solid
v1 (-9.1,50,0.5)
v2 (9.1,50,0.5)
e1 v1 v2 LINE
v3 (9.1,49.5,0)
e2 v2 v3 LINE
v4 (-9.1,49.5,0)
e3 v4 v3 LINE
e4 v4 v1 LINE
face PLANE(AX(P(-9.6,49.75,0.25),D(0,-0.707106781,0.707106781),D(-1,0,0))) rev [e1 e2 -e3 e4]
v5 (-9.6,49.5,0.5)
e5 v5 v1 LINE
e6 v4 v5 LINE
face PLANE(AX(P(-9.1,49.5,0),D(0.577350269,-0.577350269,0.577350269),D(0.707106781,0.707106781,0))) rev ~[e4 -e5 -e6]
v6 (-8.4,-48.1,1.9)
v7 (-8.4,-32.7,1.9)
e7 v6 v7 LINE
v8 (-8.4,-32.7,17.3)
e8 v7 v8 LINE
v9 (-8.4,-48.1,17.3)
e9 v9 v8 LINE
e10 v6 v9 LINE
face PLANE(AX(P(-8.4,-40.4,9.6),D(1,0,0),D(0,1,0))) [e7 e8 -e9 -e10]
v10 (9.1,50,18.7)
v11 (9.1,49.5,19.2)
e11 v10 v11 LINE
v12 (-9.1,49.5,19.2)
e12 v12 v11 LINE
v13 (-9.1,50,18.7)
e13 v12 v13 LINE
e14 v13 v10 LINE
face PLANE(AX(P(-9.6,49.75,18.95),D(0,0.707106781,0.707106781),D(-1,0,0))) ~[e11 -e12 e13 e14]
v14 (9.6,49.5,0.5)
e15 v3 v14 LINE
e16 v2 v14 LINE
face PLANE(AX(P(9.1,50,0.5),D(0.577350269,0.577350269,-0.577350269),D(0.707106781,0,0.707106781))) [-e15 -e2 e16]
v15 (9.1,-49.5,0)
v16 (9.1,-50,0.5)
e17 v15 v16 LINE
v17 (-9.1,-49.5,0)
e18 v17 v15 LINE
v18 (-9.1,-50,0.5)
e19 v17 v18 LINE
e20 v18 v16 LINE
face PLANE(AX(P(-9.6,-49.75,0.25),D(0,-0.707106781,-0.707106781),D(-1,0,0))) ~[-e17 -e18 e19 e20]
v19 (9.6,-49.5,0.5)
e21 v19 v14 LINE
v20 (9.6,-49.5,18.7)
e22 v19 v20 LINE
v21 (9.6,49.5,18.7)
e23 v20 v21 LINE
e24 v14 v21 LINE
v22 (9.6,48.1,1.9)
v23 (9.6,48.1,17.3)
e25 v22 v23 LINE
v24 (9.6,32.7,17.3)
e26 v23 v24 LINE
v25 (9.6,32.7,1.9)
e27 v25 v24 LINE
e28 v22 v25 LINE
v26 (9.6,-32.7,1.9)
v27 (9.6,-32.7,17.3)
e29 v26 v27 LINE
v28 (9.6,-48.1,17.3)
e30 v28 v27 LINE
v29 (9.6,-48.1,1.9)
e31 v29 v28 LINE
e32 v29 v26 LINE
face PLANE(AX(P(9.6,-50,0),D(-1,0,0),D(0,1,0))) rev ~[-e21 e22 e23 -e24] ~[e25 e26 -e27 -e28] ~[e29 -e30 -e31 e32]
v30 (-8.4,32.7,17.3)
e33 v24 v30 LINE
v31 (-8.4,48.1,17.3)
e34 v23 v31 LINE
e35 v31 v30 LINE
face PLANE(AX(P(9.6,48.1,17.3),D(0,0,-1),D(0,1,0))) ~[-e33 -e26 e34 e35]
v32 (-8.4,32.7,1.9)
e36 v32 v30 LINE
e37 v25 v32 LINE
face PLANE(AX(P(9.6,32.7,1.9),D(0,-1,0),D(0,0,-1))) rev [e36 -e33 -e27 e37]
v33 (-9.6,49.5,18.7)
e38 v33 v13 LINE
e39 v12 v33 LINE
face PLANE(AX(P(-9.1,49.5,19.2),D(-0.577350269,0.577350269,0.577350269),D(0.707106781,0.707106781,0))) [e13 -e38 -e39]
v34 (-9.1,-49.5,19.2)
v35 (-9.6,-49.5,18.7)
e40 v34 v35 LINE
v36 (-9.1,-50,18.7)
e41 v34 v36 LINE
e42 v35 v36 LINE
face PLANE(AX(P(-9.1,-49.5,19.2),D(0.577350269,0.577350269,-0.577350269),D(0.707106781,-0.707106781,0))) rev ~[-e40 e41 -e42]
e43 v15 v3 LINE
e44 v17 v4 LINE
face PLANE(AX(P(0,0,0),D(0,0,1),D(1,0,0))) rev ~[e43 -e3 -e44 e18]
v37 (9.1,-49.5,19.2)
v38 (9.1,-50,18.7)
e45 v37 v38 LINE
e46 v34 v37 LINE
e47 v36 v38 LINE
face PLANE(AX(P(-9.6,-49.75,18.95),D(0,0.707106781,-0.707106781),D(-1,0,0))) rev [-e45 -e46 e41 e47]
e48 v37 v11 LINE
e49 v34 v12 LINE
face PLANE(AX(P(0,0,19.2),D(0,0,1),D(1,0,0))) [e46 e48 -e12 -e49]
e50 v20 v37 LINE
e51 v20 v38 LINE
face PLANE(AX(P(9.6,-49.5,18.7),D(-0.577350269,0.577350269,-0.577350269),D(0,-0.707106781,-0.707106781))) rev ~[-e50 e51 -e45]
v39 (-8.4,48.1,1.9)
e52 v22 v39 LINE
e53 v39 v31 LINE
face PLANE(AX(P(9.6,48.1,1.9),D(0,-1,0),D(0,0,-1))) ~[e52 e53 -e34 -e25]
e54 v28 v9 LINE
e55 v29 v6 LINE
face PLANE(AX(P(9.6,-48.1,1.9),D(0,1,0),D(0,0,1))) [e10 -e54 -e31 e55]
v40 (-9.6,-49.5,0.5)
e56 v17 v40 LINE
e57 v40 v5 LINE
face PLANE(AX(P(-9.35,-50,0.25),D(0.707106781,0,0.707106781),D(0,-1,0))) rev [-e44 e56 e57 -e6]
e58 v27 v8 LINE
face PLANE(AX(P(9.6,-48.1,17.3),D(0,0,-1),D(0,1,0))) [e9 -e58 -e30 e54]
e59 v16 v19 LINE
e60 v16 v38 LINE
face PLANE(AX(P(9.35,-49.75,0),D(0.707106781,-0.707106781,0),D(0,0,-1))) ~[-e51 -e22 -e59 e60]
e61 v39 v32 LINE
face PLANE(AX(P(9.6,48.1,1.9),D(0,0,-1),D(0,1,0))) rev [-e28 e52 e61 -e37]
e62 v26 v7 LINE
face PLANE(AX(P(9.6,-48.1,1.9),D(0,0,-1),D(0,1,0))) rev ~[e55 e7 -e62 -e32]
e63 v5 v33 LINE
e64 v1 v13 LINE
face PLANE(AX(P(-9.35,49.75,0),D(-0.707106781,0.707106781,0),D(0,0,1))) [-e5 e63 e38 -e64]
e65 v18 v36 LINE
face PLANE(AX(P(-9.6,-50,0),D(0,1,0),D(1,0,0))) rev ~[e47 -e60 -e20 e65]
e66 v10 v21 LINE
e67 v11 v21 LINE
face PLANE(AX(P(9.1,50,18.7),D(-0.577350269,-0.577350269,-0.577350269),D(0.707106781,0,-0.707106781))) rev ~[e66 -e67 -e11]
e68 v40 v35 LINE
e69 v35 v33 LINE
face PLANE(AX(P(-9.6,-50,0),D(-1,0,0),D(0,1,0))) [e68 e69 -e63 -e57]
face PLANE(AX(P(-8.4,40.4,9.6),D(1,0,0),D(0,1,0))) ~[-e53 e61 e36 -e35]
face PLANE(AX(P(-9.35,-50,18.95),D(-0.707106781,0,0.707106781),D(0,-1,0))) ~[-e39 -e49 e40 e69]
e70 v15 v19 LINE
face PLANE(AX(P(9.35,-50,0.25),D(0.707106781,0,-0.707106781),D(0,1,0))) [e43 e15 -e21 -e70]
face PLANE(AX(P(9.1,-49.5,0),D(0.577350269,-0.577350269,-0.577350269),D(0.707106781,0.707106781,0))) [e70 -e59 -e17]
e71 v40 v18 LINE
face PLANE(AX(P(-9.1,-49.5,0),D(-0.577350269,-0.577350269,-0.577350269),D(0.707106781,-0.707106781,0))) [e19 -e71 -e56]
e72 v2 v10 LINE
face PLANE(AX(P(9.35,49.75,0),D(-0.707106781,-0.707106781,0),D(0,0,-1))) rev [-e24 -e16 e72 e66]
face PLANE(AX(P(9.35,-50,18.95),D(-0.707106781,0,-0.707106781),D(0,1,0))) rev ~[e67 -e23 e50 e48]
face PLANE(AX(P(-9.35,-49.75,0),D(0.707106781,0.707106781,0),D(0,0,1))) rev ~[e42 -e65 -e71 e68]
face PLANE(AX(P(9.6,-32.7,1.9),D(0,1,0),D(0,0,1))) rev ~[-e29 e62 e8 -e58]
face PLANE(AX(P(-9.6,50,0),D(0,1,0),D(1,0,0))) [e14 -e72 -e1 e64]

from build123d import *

# Parameters (mm, degrees)
F0_W     = 19.2
F0_H     = 100
F1_DEPTH = 19.2
F2_W     = 15.4
F2_H     = 15.4
F3_DEPTH = 18
F4_SIZE  = 0.5


# Not quite as in the source:
# - a pattern or mirror of a feature is missing from the dataset's text; its kind, count and spacing are read off the source's solid


with BuildPart() as f1:
    # F0 (on Top) → F1 (new body)
    with BuildSketch(Plane.XY):
        Rectangle(F0_W, F0_H)
    extrude(amount=F1_DEPTH)

    # F2 (on face) → F3 (cut)
    with BuildSketch(Plane.YZ.offset(9.6)):
        with Locations((-40.4, 9.6)):
            Rectangle(F2_W, F2_H)
    f3 = extrude(amount=-F3_DEPTH, mode=Mode.SUBTRACT)

    # F3_copies: F3 across plane
    add(f3.mirror(Plane.ZX), mode=Mode.SUBTRACT)

    # F4
    f4_edges = [f1.edges().sort_by_distance(p)[0] for p in [
        (-9.6, 50, 9.6),
        (-9.6, -50, 9.6),
        (-9.6, 0, 0),
        (-9.6, 0, 19.2),
        (0, -50, 19.2),
        (9.6, 0, 19.2),
        (0, 50, 19.2),
        (9.6, -50, 9.6),
        (0, -50, 0),
        (9.6, 0, 0),
        (0, 50, 0),
        (9.6, 50, 9.6),
    ]]
    chamfer(f4_edges, length=F4_SIZE)


solid = f1.part
